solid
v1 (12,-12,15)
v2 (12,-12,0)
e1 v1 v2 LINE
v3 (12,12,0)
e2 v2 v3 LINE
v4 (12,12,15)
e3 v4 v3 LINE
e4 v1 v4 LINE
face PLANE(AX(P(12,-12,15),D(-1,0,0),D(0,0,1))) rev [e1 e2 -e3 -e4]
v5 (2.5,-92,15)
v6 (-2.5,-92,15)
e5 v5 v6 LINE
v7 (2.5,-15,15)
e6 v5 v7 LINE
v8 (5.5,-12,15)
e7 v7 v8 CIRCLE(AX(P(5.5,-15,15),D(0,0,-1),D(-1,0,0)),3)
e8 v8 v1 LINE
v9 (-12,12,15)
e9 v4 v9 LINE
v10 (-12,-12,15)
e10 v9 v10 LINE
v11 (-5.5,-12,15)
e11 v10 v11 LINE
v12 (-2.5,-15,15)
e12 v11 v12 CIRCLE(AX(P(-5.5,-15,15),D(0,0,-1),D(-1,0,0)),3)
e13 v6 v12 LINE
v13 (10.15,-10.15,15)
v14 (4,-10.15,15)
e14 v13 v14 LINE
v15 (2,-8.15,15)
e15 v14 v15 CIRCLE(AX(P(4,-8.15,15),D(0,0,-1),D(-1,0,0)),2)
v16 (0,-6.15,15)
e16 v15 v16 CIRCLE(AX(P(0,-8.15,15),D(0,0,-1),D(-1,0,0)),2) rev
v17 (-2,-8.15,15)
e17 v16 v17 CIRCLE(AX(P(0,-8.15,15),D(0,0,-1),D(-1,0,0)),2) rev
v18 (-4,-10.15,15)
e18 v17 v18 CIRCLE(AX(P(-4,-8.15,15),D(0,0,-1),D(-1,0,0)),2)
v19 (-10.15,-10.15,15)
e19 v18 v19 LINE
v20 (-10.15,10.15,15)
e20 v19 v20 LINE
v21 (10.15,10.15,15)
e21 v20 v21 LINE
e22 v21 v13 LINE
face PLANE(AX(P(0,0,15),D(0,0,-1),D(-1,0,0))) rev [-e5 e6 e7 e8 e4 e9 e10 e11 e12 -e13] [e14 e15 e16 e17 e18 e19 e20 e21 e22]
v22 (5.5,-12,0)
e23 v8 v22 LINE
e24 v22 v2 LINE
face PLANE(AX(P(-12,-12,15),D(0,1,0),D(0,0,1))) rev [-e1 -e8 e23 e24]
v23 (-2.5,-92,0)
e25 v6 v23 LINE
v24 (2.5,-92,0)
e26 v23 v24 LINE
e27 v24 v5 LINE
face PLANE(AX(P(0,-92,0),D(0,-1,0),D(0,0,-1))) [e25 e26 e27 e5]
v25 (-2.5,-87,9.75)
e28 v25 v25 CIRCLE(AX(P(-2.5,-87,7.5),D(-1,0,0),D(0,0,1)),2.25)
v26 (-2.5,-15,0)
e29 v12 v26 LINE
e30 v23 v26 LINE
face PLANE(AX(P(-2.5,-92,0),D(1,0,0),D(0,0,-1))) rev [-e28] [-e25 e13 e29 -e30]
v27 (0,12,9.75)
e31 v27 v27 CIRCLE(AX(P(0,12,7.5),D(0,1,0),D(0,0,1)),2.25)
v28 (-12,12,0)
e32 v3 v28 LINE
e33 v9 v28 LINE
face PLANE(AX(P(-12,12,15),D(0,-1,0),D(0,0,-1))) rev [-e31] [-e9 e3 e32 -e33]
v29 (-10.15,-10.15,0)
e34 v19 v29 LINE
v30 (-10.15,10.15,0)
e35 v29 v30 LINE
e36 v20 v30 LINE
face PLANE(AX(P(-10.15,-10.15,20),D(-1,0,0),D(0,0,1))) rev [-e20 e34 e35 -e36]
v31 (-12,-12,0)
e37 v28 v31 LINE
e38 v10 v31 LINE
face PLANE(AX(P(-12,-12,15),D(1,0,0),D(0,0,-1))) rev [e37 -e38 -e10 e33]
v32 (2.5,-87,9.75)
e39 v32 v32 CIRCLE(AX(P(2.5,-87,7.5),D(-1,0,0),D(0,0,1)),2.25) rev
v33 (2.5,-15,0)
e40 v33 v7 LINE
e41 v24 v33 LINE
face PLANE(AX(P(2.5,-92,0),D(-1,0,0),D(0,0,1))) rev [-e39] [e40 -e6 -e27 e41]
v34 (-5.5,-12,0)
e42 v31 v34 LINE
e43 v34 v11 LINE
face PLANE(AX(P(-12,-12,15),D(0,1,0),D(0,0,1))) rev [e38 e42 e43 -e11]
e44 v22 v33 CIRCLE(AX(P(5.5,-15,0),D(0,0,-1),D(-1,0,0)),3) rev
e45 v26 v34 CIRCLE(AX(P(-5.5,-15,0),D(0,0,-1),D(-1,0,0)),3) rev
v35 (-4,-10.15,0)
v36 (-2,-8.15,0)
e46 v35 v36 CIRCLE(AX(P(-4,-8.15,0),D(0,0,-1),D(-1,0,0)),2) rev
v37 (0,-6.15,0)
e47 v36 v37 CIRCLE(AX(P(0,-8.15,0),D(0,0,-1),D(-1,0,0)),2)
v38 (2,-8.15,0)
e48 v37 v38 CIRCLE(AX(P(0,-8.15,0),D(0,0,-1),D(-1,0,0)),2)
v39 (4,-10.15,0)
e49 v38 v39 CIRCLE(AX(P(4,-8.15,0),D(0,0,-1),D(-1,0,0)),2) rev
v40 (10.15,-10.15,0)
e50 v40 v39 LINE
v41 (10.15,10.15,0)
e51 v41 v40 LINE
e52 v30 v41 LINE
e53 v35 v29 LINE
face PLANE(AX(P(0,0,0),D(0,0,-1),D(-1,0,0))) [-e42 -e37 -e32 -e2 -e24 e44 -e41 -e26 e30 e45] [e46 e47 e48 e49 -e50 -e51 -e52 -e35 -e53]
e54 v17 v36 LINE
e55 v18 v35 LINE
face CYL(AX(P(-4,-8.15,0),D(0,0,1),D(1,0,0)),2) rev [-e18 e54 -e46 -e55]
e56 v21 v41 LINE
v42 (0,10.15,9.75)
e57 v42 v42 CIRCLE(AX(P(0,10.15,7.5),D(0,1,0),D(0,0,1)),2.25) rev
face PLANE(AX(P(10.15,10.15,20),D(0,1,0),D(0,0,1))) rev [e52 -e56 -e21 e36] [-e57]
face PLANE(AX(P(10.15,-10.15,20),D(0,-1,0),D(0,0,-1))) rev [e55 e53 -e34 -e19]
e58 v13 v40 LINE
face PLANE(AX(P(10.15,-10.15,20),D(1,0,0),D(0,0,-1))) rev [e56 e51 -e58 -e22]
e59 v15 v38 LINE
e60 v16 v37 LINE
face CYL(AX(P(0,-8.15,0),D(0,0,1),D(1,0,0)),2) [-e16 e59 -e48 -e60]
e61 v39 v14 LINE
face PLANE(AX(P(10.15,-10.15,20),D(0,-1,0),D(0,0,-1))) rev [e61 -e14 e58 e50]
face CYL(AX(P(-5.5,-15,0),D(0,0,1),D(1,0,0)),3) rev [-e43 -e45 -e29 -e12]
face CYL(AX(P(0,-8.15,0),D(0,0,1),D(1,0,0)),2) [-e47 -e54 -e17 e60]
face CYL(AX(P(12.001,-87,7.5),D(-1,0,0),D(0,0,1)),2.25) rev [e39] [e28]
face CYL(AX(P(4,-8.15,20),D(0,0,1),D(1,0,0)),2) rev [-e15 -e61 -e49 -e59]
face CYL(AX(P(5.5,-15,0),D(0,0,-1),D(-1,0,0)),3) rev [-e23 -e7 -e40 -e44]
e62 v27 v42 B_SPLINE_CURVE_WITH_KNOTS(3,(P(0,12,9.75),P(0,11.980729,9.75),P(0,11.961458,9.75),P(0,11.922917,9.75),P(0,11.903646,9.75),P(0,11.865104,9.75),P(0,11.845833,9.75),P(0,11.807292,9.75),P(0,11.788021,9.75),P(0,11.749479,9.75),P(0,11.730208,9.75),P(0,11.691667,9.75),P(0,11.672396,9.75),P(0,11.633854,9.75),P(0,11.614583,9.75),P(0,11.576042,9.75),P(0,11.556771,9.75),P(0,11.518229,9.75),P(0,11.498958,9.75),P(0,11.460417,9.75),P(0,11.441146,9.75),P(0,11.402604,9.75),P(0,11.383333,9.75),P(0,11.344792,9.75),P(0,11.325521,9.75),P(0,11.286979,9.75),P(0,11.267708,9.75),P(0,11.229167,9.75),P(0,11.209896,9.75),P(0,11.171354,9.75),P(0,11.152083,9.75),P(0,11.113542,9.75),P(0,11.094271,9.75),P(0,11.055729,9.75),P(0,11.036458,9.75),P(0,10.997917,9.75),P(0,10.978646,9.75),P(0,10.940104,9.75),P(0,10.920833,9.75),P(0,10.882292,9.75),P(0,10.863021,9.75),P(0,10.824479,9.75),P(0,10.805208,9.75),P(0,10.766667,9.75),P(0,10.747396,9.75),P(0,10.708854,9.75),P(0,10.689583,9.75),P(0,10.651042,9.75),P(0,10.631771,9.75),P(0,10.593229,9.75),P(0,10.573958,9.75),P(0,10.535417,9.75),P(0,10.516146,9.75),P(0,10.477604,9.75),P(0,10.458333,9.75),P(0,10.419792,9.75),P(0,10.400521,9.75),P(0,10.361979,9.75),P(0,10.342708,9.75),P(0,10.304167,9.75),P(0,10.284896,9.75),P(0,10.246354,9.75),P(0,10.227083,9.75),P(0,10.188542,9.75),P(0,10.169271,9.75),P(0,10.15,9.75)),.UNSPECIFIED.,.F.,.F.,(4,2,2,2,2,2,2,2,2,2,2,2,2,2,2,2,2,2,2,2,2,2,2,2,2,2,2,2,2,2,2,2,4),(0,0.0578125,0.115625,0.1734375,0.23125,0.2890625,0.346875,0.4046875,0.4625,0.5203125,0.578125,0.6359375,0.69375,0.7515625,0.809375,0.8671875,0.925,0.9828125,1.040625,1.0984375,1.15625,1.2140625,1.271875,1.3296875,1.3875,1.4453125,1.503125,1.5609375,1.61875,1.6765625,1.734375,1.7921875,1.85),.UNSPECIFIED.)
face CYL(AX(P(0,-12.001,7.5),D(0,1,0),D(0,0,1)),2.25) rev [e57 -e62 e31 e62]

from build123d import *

# Parameters (mm, degrees)
CROQUIS1_W              = 24
CROQUIS1_H              = 24
SALIENTE_EXTRUIR1_DEPTH = 15
CROQUIS2_W              = 20.3
CROQUIS2_H              = 20.3
CORTAR_EXTRUIR1_DEPTH   = 20
CORTAR_EXTRUIR2_REACH   = 32.741
CROQUIS3_R              = 2.25
CROQUIS4_W              = 5
CROQUIS4_H              = 15
SALIENTE_EXTRUIR2_DEPTH = 80
CROQUIS5_W              = 4
CROQUIS5_H              = 4
SALIENTE_EXTRUIR3_DEPTH = 15
REDONDEO1_START         = -1
REDONDEO1_DEPTH         = 17
REDONDEO1_2_DEPTH       = 15
CORTAR_EXTRUIR5_REACH   = 96.336
CROQUIS6_R              = 2.25
REDONDEO3_R             = 3


with BuildPart() as part:
    # Croquis1 → Saliente-Extruir1 (new body)
    with BuildSketch(Plane.XY):
        Rectangle(CROQUIS1_W, CROQUIS1_H)
    extrude(amount=SALIENTE_EXTRUIR1_DEPTH)

    # Croquis2 → Cortar-Extruir1 (cut)
    with BuildSketch(Plane(origin=(0, 0, 0), x_dir=(-1, 0, 0), z_dir=(0, 0, -1))):
        Rectangle(CROQUIS2_W, CROQUIS2_H)
    extrude(amount=-CORTAR_EXTRUIR1_DEPTH, mode=Mode.SUBTRACT)

    # Croquis3 → Cortar-Extruir2 (cut, up to next)
    with BuildSketch(Plane(origin=(0, 12, 0), x_dir=(1, 0, 0), z_dir=(0, 1, 0)), mode=Mode.PRIVATE) as cortar_extruir2_sk1:
        with Locations(Location((0, -7.5, 0), (0, 0, 270))):
            Circle(CROQUIS3_R)
    cortar_extruir2_tool1 = extrude(cortar_extruir2_sk1.sketch, amount=-CORTAR_EXTRUIR2_REACH, mode=Mode.PRIVATE) & part.part
    add(cortar_extruir2_tool1.solids().sort_by_distance((0, 12, 7.5))[0], mode=Mode.SUBTRACT)

    # Croquis4 → Saliente-Extruir2 (add)
    with BuildSketch(Plane.XZ.offset(12)):
        with Locations((0, 7.5)):
            Rectangle(CROQUIS4_W, CROQUIS4_H)
    extrude(amount=SALIENTE_EXTRUIR2_DEPTH)

    # Croquis5 → Saliente-Extruir3 (add)
    with BuildSketch(Plane.XY.offset(15)):
        with Locations((0, -8.15)):
            Rectangle(CROQUIS5_W, CROQUIS5_H)
    extrude(amount=-SALIENTE_EXTRUIR3_DEPTH)

    # Redondeo1: read off the stored shape, not the designer's step
    # Redondeo1 outline → Redondeo1 (cut)
    with BuildSketch(Plane.XY.offset(REDONDEO1_START)):
        with BuildLine():
            ThreePointArc((-2, -8.15), (-1.414213562, -6.735786438), (0, -6.15))
            Line((0, -6.15), (-2, -6.15))
            Line((-2, -6.15), (-2, -8.15))
        make_face()
        with BuildLine():
            ThreePointArc((0, -6.15), (1.414213562, -6.735786438), (2, -8.15))
            Line((2, -8.15), (2, -6.15))
            Line((2, -6.15), (0, -6.15))
        make_face()
    extrude(amount=REDONDEO1_DEPTH, mode=Mode.SUBTRACT)

    # Redondeo1 2 outline → Redondeo1 2 (add)
    with BuildSketch(Plane.XY):
        with BuildLine():
            Line((-2, -10.15), (-2, -8.15))
            ThreePointArc((-2, -8.15), (-2.585786438, -9.564213562), (-4, -10.15))
            Line((-4, -10.15), (-2, -10.15))
        make_face()
        with BuildLine():
            ThreePointArc((4, -10.15), (2.585786438, -9.564213562), (2, -8.15))
            Line((2, -8.15), (2, -10.15))
            Line((2, -10.15), (4, -10.15))
        make_face()
    extrude(amount=REDONDEO1_2_DEPTH)

    # Croquis6 → Cortar-Extruir5 (cut, up to next)
    with BuildSketch(Plane.ZY.offset(2.5), mode=Mode.PRIVATE) as cortar_extruir5_sk1:
        with Locations((7.5, -87)):
            Circle(CROQUIS6_R)
    cortar_extruir5_tool1 = extrude(cortar_extruir5_sk1.sketch, amount=-CORTAR_EXTRUIR5_REACH, mode=Mode.PRIVATE) & part.part
    add(cortar_extruir5_tool1.solids().sort_by_distance((-2.5, -87, 7.5))[0], mode=Mode.SUBTRACT)

    # Redondeo3
    redondeo3_edges = [part.edges().sort_by_distance(p)[0] for p in [
        (-2.5, -12, 7.5),
        (2.5, -12, 7.5),
    ]]
    fillet(redondeo3_edges, radius=REDONDEO3_R)


solid = part.part
